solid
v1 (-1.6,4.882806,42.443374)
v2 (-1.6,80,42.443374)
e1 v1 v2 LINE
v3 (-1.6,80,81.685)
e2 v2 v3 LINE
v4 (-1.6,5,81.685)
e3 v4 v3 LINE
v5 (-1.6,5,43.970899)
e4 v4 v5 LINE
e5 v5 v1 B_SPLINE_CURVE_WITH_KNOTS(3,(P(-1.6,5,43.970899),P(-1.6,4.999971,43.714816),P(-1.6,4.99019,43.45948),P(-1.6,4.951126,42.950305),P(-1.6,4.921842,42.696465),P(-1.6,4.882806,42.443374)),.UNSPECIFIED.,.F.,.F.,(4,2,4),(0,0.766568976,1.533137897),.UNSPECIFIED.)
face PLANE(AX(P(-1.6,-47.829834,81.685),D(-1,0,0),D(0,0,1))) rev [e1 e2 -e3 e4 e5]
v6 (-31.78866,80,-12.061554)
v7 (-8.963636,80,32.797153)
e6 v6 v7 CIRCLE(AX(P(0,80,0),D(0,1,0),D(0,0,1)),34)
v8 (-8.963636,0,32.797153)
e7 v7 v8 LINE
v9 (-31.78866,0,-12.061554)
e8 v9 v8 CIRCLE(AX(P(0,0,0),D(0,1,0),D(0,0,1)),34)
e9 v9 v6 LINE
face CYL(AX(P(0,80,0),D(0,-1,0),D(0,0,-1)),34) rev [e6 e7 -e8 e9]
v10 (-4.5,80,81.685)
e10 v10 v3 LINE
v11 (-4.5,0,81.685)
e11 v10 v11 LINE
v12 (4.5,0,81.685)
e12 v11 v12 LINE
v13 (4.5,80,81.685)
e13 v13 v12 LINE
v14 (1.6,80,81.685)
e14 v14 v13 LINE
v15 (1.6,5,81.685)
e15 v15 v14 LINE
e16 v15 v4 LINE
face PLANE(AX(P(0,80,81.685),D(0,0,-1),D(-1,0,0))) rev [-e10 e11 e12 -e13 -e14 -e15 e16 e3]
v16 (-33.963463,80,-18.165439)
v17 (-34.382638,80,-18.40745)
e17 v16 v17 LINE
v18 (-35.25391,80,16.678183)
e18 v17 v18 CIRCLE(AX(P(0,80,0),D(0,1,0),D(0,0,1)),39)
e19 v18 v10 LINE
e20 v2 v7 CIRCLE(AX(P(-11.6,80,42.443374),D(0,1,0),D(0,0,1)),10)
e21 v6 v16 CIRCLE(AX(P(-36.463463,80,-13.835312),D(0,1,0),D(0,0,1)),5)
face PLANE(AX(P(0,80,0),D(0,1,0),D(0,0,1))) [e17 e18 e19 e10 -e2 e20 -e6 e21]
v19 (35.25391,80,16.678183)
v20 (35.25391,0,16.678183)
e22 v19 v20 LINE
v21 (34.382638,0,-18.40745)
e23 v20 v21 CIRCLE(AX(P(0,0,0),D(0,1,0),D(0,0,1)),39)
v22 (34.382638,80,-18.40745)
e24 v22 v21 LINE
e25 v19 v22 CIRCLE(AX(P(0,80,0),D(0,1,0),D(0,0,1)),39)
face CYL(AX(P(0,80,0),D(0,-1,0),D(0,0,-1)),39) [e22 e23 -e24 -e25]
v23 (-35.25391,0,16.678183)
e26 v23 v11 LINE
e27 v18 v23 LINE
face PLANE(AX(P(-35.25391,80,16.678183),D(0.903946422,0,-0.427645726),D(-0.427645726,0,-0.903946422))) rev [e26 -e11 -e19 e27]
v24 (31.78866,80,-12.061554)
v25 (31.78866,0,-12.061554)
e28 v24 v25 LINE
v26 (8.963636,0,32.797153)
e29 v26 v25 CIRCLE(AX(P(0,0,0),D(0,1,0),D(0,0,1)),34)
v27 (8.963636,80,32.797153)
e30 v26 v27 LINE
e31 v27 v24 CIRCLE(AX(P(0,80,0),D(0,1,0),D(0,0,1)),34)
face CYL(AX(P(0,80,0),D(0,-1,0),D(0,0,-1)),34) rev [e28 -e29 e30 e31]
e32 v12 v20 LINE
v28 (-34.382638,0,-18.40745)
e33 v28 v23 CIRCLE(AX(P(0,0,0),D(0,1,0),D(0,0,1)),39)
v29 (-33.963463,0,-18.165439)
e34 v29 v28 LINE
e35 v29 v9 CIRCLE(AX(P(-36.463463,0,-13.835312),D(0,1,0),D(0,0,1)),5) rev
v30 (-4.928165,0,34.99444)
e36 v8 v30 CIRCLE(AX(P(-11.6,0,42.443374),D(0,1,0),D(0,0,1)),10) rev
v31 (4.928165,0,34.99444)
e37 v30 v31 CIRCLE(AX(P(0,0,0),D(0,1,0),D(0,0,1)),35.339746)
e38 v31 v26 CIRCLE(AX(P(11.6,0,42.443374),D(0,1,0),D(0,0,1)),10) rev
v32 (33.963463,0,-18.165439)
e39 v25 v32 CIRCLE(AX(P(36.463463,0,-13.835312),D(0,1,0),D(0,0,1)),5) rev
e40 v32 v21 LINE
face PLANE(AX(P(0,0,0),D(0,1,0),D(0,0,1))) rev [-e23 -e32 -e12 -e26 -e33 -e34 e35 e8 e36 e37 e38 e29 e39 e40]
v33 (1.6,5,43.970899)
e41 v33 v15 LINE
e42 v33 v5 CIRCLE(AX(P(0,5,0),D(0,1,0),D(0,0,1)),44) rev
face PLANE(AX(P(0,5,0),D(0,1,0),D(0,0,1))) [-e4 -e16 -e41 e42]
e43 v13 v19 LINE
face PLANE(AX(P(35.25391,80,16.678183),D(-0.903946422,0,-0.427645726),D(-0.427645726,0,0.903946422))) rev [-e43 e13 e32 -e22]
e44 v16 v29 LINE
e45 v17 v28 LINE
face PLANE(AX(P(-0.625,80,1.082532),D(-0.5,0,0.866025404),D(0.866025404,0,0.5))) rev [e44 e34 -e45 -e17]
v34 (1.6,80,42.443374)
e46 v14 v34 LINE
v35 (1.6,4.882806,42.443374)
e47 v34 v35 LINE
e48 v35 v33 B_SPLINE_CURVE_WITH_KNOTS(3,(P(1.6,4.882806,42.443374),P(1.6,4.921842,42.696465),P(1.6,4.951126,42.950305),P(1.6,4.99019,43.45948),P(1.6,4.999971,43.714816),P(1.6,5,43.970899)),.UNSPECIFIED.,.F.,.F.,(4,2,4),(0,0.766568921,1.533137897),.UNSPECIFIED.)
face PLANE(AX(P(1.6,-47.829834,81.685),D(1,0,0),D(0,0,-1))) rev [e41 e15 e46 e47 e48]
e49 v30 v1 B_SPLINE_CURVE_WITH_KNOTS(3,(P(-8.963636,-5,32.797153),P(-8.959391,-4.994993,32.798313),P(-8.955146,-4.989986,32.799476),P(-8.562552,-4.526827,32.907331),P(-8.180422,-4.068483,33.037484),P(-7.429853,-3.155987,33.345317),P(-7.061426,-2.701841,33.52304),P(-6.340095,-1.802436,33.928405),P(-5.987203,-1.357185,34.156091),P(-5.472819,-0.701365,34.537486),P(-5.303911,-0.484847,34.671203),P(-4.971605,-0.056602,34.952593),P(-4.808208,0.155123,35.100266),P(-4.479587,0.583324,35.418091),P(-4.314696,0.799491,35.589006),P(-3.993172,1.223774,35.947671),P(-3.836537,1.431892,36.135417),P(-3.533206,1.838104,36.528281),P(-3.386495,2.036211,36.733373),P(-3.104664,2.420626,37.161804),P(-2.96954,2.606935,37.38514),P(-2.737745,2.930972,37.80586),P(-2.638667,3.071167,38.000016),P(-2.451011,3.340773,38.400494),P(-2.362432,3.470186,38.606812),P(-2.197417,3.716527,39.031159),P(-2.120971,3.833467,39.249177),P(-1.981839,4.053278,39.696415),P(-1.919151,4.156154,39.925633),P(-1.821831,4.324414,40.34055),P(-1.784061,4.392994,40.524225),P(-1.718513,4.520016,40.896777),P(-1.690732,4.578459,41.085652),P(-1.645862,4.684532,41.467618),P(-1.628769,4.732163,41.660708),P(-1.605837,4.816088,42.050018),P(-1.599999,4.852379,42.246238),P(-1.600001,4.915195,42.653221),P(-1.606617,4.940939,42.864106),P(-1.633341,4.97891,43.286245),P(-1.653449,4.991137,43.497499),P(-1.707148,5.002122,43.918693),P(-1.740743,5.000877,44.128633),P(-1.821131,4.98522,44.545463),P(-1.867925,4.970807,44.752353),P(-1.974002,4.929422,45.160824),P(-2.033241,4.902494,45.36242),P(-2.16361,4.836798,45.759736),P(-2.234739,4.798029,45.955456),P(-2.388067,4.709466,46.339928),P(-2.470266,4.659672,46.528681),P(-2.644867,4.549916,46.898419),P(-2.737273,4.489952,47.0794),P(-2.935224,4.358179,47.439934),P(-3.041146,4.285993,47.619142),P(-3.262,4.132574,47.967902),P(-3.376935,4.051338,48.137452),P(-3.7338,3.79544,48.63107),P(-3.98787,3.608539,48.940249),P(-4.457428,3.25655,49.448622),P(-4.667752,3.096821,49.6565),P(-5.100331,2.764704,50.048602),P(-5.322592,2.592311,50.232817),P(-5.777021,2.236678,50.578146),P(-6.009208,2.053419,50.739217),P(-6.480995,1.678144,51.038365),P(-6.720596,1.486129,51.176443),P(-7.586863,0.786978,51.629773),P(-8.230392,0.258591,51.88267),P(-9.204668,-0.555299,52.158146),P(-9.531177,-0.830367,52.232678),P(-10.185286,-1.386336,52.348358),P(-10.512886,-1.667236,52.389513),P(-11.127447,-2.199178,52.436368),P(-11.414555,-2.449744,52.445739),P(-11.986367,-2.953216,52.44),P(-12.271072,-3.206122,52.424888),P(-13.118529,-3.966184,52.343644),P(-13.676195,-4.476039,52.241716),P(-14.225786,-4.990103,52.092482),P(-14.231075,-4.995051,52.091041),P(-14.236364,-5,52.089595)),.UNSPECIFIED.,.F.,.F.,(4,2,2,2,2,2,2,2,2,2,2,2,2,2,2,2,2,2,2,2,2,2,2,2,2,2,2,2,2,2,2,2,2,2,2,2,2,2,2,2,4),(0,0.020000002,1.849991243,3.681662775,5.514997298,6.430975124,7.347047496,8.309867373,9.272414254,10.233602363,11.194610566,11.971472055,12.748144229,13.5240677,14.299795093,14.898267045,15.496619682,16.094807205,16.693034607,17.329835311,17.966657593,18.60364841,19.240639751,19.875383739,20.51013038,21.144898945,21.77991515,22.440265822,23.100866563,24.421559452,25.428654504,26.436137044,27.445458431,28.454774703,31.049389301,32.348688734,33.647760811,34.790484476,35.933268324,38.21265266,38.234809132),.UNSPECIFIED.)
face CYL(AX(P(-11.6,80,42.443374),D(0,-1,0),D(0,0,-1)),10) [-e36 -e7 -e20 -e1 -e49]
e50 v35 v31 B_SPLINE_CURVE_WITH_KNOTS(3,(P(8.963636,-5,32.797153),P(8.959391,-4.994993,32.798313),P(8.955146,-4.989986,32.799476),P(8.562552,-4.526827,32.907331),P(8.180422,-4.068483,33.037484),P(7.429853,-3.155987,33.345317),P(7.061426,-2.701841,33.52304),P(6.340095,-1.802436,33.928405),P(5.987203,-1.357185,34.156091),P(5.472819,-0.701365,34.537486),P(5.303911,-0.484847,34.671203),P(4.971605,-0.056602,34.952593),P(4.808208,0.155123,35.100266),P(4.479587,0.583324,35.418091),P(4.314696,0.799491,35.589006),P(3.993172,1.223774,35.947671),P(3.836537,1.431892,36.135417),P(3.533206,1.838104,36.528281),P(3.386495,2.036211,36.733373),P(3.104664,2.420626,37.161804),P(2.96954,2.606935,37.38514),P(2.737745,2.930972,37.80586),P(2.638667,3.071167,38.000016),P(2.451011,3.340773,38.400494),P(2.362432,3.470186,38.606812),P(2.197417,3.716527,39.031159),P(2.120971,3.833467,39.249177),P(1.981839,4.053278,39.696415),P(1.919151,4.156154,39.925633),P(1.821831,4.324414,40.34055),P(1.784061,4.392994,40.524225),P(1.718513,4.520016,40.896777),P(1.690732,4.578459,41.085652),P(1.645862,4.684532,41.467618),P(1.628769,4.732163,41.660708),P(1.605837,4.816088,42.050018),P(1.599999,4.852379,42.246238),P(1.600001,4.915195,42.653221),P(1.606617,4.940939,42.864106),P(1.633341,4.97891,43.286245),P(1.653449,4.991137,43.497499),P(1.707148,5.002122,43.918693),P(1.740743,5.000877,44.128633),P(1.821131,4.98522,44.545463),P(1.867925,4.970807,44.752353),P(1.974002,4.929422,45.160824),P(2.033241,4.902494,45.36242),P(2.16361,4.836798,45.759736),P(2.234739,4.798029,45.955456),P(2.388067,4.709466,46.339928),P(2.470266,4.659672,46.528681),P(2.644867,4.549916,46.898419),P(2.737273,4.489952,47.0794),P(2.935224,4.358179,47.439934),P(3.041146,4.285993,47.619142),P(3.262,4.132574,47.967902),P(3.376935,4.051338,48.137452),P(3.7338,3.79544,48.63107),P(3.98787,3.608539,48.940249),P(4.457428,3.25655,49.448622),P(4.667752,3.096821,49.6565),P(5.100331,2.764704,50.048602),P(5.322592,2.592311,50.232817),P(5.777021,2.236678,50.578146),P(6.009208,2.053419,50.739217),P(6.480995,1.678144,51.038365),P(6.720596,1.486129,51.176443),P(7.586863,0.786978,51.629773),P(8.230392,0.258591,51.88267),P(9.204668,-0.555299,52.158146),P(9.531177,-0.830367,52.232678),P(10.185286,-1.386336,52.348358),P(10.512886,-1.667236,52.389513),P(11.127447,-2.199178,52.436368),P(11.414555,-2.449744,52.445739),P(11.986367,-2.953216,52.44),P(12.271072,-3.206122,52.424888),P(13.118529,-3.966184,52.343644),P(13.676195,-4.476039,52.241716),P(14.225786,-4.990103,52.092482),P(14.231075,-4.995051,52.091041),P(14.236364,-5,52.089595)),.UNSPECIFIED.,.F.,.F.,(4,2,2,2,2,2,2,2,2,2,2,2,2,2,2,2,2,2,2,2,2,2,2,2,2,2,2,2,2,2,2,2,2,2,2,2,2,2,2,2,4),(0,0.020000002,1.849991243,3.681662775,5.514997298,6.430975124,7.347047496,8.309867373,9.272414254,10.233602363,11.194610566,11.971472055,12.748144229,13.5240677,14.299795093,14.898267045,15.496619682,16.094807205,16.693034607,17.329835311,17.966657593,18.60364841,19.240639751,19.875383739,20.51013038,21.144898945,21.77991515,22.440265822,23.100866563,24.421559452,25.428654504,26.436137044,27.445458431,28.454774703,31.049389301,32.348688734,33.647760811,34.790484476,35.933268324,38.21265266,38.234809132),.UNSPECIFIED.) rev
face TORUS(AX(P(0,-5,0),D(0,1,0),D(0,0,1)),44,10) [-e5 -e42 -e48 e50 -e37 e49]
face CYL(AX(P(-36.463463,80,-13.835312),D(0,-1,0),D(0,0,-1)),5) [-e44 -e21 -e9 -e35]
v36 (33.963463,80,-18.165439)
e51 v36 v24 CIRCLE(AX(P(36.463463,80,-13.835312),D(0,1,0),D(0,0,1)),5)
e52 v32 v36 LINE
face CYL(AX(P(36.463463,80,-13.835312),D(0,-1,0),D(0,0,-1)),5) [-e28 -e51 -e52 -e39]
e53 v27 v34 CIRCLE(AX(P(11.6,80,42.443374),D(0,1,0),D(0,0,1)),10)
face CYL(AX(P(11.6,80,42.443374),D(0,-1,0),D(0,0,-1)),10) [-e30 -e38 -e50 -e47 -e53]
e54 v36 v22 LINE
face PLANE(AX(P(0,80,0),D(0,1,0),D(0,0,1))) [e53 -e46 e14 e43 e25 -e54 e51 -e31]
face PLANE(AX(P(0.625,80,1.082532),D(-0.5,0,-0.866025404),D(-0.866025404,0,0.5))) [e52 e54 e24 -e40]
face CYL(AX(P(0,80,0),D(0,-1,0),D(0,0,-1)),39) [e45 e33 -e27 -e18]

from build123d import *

# Parameters (mm, degrees)
FIN_SLOT_EXTRUDE_DEPTH = 80
FIN_START              = -75
FIN_SLOT_DEPTH         = 75
FILLET1_R              = 10
FILLET2_R              = 5


with BuildPart() as part:
    # Sketch2 → Fin slot extrude (new body)
    with BuildSketch(Plane(origin=(0, 0, 0), x_dir=(1, 0, 0), z_dir=(0, 1, 0))):
        with BuildLine():
            Line((-35.253910446, -16.678183302), (-4.5, -81.685))
            Line((-4.5, -81.685), (4.5, -81.685))
            Line((4.5, -81.685), (35.253910446, -16.678183302))
            ThreePointArc((35.253910446, -16.678183302), (38.987980591, 0.968178408), (34.382638025, 18.407449646))
            Line((34.382638025, 18.407449646), (30.049957519, 15.90597539))
            ThreePointArc((30.049957519, 15.90597539), (0, -34), (-30.049957519, 15.90597539))
            Line((-30.049957519, 15.90597539), (-34.382638025, 18.407449646))
            ThreePointArc((-34.382638025, 18.407449646), (-38.987980591, 0.968178408), (-35.253910446, -16.678183302))
        make_face()
    extrude(amount=FIN_SLOT_EXTRUDE_DEPTH)

    # Sketch3 → Fin slot (cut)
    with BuildSketch(Plane(origin=(0, 80, 0), x_dir=(1, 0, 0), z_dir=(0, 1, 0)).offset(FIN_START)):
        with BuildLine():
            Line((1.6, -81.685), (1.6, -33.962332075))
            ThreePointArc((1.6, -33.962332075), (0, -34), (-1.6, -33.962332075))
            Line((-1.6, -33.962332075), (-1.6, -81.685))
            Line((-1.6, -81.685), (1.6, -81.685))
        make_face()
    extrude(amount=FIN_SLOT_DEPTH, mode=Mode.SUBTRACT)

    # Fillet1
    # the kernel refuses this fillet: 10 mm, written as the material it takes off along each edge
    with BuildSketch(Plane(origin=(-1.6, 5, 33.962332075), x_dir=(0, 0, 1), z_dir=(0, 1, 0))) as fillet1_piece_1:
        with BuildLine():
            CenterArc((8.481041966, -10), FILLET1_R, 90, 74.714058958)
            Line((-1.165179407, -7.363636364), (-1.358103835, -7.310909091))
            ThreePointArc((-1.358103835, -7.310909091), (-0.577691759, -3.682593204), (-0.199778424, 0.009411765))
            Line((-0.199778424, 0.009411765), (0, 0.2))
            Line((0, 0.2), (8.481041966, 0.2))
            Line((8.481041966, 0.2), (8.481041966, 0))
        make_face()
    extrude(amount=75, mode=Mode.SUBTRACT)
    with BuildSketch(Plane(origin=(1.6, 5, 33.962332075), x_dir=(0, 0, 1), z_dir=(0, 1, 0))) as fillet1_piece_2:
        with BuildLine():
            CenterArc((8.481041966, 10), FILLET1_R, 195.285941042, 74.714058958)
            Line((-1.165179407, 7.363636364), (-1.358103835, 7.310909091))
            ThreePointArc((-1.358103835, 7.310909091), (-0.577691759, 3.682593204), (-0.199778424, -0.009411765))
            Line((-0.199778424, -0.009411765), (0, -0.2))
            Line((0, -0.2), (8.481041966, -0.2))
            Line((8.481041966, -0.2), (8.481041966, 0))
        make_face()
    extrude(amount=75, mode=Mode.SUBTRACT)
    with BuildSketch(Plane(origin=(0, 5, 0), x_dir=(0.7049632922211216, 0, 0.7092437920918008), z_dir=(0.7092437920918008, 0, -0.7049632922211216))) as fillet1_piece_3_section:
        with BuildLine():
            CenterArc((34 + FILLET1_R, FILLET1_R), FILLET1_R, 180, 90)
            Line((34, FILLET1_R), (34 - FILLET1_R * 0.02, FILLET1_R))
            Line((34 - FILLET1_R * 0.02, FILLET1_R), (34 - FILLET1_R * 0.02, -FILLET1_R * 0.02))
            Line((34 - FILLET1_R * 0.02, -FILLET1_R * 0.02), (34 + FILLET1_R, -FILLET1_R * 0.02))
            Line((34 + FILLET1_R, -FILLET1_R * 0.02), (34 + FILLET1_R, 0))
        make_face()
    fillet1_piece_3 = revolve(axis=Axis((0, 5, 0), (0, -1, 0)), revolution_arc=89.653157122, mode=Mode.PRIVATE)
    fillet1_piece_3 = split(fillet1_piece_3, bisect_by=Plane(origin=(1.6, 2.736001805, 36.252063161), z_dir=(-1, 0, 0)), keep=Keep.TOP, mode=Mode.PRIVATE)
    fillet1_piece_3 = split(fillet1_piece_3, bisect_by=Plane(origin=(-1.6, 2.736001805, 36.252063161), z_dir=(1, 0, 0)), keep=Keep.TOP, mode=Mode.PRIVATE)
    add(fillet1_piece_3, mode=Mode.SUBTRACT)
    with BuildSketch(Plane(origin=(0, 5, 0), x_dir=(0.7049632922211216, 0, 0.7092437920918008), z_dir=(0.7092437920918008, 0, -0.7049632922211216))) as fillet1_piece_4a_section:
        with BuildLine():
            CenterArc((34 + FILLET1_R, FILLET1_R), FILLET1_R, 180, 90)
            Line((34, FILLET1_R), (34 - FILLET1_R * 0.02, FILLET1_R))
            Line((34 - FILLET1_R * 0.02, FILLET1_R), (34 - FILLET1_R * 0.02, -FILLET1_R * 0.02))
            Line((34 - FILLET1_R * 0.02, -FILLET1_R * 0.02), (34 + FILLET1_R, -FILLET1_R * 0.02))
            Line((34 + FILLET1_R, -FILLET1_R * 0.02), (34 + FILLET1_R, 0))
        make_face()
    fillet1_piece_4a = revolve(axis=Axis((0, 5, 0), (0, -1, 0)), revolution_arc=89.653157122, mode=Mode.PRIVATE)
    fillet1_piece_4a = split(fillet1_piece_4a, bisect_by=Plane(origin=(-1.6, 2.81629174, 32.584573329), z_dir=(-1, 0, 0)), keep=Keep.TOP, mode=Mode.PRIVATE)
    with BuildSketch(Plane(origin=(-1.6, -16.202604914, 33.962332075), x_dir=(0, 0, 1), z_dir=(0, 1, 0))) as fillet1_piece_4b_section:
        with BuildLine():
            CenterArc((8.481041966, -10), FILLET1_R, 90, 74.714058958)
            Line((-1.165179407, -7.363636364), (-1.358103835, -7.310909091))
            ThreePointArc((-1.358103835, -7.310909091), (-0.577691759, -3.682593204), (-0.199778424, 0.009411765))
            Line((-0.199778424, 0.009411765), (0, 0.2))
            Line((0, 0.2), (8.481041966, 0.2))
            Line((8.481041966, 0.2), (8.481041966, 0))
        make_face()
    fillet1_piece_4b = extrude(amount=96.202604914, mode=Mode.PRIVATE)
    fillet1_piece_4b = split(fillet1_piece_4b, bisect_by=Plane(origin=(-3.235617235, 5, 35.755925785), z_dir=(0, -1, 0)), keep=Keep.TOP, mode=Mode.PRIVATE)
    fillet1_piece_4 = fillet1_piece_4a & fillet1_piece_4b
    add(fillet1_piece_4, mode=Mode.SUBTRACT)
    with BuildSketch(Plane(origin=(1.6, -16.202604914, 33.962332075), x_dir=(0, 0, 1), z_dir=(0, 1, 0))) as fillet1_piece_5a_section:
        with BuildLine():
            CenterArc((8.481041966, 10), FILLET1_R, 195.285941042, 74.714058958)
            Line((-1.165179407, 7.363636364), (-1.358103835, 7.310909091))
            ThreePointArc((-1.358103835, 7.310909091), (-0.577691759, 3.682593204), (-0.199778424, -0.009411765))
            Line((-0.199778424, -0.009411765), (0, -0.2))
            Line((0, -0.2), (8.481041966, -0.2))
            Line((8.481041966, -0.2), (8.481041966, 0))
        make_face()
    fillet1_piece_5a = extrude(amount=96.202604914, mode=Mode.PRIVATE)
    fillet1_piece_5a = split(fillet1_piece_5a, bisect_by=Plane(origin=(3.235617235, 5, 35.755925785), z_dir=(0, -1, 0)), keep=Keep.TOP, mode=Mode.PRIVATE)
    with BuildSketch(Plane(origin=(0, 5, 0), x_dir=(0.7049632922211216, 0, 0.7092437920918008), z_dir=(0.7092437920918008, 0, -0.7049632922211216))) as fillet1_piece_5b_section:
        with BuildLine():
            CenterArc((34 + FILLET1_R, FILLET1_R), FILLET1_R, 180, 90)
            Line((34, FILLET1_R), (34 - FILLET1_R * 0.02, FILLET1_R))
            Line((34 - FILLET1_R * 0.02, FILLET1_R), (34 - FILLET1_R * 0.02, -FILLET1_R * 0.02))
            Line((34 - FILLET1_R * 0.02, -FILLET1_R * 0.02), (34 + FILLET1_R, -FILLET1_R * 0.02))
            Line((34 + FILLET1_R, -FILLET1_R * 0.02), (34 + FILLET1_R, 0))
        make_face()
    fillet1_piece_5b = revolve(axis=Axis((0, 5, 0), (0, -1, 0)), revolution_arc=89.653157122, mode=Mode.PRIVATE)
    fillet1_piece_5b = split(fillet1_piece_5b, bisect_by=Plane(origin=(1.6, 2.816291902, 32.584573464), z_dir=(1, 0, 0)), keep=Keep.TOP, mode=Mode.PRIVATE)
    fillet1_piece_5 = fillet1_piece_5a & fillet1_piece_5b
    add(fillet1_piece_5, mode=Mode.SUBTRACT)

    # Fillet2
    fillet2_edges = [part.edges().sort_by_distance(p)[0] for p in [
        (-30.049957519, 40, -15.90597539),
        (30.049957519, 40, -15.90597539),
    ]]
    fillet(fillet2_edges, radius=FILLET2_R)


solid = part.part
